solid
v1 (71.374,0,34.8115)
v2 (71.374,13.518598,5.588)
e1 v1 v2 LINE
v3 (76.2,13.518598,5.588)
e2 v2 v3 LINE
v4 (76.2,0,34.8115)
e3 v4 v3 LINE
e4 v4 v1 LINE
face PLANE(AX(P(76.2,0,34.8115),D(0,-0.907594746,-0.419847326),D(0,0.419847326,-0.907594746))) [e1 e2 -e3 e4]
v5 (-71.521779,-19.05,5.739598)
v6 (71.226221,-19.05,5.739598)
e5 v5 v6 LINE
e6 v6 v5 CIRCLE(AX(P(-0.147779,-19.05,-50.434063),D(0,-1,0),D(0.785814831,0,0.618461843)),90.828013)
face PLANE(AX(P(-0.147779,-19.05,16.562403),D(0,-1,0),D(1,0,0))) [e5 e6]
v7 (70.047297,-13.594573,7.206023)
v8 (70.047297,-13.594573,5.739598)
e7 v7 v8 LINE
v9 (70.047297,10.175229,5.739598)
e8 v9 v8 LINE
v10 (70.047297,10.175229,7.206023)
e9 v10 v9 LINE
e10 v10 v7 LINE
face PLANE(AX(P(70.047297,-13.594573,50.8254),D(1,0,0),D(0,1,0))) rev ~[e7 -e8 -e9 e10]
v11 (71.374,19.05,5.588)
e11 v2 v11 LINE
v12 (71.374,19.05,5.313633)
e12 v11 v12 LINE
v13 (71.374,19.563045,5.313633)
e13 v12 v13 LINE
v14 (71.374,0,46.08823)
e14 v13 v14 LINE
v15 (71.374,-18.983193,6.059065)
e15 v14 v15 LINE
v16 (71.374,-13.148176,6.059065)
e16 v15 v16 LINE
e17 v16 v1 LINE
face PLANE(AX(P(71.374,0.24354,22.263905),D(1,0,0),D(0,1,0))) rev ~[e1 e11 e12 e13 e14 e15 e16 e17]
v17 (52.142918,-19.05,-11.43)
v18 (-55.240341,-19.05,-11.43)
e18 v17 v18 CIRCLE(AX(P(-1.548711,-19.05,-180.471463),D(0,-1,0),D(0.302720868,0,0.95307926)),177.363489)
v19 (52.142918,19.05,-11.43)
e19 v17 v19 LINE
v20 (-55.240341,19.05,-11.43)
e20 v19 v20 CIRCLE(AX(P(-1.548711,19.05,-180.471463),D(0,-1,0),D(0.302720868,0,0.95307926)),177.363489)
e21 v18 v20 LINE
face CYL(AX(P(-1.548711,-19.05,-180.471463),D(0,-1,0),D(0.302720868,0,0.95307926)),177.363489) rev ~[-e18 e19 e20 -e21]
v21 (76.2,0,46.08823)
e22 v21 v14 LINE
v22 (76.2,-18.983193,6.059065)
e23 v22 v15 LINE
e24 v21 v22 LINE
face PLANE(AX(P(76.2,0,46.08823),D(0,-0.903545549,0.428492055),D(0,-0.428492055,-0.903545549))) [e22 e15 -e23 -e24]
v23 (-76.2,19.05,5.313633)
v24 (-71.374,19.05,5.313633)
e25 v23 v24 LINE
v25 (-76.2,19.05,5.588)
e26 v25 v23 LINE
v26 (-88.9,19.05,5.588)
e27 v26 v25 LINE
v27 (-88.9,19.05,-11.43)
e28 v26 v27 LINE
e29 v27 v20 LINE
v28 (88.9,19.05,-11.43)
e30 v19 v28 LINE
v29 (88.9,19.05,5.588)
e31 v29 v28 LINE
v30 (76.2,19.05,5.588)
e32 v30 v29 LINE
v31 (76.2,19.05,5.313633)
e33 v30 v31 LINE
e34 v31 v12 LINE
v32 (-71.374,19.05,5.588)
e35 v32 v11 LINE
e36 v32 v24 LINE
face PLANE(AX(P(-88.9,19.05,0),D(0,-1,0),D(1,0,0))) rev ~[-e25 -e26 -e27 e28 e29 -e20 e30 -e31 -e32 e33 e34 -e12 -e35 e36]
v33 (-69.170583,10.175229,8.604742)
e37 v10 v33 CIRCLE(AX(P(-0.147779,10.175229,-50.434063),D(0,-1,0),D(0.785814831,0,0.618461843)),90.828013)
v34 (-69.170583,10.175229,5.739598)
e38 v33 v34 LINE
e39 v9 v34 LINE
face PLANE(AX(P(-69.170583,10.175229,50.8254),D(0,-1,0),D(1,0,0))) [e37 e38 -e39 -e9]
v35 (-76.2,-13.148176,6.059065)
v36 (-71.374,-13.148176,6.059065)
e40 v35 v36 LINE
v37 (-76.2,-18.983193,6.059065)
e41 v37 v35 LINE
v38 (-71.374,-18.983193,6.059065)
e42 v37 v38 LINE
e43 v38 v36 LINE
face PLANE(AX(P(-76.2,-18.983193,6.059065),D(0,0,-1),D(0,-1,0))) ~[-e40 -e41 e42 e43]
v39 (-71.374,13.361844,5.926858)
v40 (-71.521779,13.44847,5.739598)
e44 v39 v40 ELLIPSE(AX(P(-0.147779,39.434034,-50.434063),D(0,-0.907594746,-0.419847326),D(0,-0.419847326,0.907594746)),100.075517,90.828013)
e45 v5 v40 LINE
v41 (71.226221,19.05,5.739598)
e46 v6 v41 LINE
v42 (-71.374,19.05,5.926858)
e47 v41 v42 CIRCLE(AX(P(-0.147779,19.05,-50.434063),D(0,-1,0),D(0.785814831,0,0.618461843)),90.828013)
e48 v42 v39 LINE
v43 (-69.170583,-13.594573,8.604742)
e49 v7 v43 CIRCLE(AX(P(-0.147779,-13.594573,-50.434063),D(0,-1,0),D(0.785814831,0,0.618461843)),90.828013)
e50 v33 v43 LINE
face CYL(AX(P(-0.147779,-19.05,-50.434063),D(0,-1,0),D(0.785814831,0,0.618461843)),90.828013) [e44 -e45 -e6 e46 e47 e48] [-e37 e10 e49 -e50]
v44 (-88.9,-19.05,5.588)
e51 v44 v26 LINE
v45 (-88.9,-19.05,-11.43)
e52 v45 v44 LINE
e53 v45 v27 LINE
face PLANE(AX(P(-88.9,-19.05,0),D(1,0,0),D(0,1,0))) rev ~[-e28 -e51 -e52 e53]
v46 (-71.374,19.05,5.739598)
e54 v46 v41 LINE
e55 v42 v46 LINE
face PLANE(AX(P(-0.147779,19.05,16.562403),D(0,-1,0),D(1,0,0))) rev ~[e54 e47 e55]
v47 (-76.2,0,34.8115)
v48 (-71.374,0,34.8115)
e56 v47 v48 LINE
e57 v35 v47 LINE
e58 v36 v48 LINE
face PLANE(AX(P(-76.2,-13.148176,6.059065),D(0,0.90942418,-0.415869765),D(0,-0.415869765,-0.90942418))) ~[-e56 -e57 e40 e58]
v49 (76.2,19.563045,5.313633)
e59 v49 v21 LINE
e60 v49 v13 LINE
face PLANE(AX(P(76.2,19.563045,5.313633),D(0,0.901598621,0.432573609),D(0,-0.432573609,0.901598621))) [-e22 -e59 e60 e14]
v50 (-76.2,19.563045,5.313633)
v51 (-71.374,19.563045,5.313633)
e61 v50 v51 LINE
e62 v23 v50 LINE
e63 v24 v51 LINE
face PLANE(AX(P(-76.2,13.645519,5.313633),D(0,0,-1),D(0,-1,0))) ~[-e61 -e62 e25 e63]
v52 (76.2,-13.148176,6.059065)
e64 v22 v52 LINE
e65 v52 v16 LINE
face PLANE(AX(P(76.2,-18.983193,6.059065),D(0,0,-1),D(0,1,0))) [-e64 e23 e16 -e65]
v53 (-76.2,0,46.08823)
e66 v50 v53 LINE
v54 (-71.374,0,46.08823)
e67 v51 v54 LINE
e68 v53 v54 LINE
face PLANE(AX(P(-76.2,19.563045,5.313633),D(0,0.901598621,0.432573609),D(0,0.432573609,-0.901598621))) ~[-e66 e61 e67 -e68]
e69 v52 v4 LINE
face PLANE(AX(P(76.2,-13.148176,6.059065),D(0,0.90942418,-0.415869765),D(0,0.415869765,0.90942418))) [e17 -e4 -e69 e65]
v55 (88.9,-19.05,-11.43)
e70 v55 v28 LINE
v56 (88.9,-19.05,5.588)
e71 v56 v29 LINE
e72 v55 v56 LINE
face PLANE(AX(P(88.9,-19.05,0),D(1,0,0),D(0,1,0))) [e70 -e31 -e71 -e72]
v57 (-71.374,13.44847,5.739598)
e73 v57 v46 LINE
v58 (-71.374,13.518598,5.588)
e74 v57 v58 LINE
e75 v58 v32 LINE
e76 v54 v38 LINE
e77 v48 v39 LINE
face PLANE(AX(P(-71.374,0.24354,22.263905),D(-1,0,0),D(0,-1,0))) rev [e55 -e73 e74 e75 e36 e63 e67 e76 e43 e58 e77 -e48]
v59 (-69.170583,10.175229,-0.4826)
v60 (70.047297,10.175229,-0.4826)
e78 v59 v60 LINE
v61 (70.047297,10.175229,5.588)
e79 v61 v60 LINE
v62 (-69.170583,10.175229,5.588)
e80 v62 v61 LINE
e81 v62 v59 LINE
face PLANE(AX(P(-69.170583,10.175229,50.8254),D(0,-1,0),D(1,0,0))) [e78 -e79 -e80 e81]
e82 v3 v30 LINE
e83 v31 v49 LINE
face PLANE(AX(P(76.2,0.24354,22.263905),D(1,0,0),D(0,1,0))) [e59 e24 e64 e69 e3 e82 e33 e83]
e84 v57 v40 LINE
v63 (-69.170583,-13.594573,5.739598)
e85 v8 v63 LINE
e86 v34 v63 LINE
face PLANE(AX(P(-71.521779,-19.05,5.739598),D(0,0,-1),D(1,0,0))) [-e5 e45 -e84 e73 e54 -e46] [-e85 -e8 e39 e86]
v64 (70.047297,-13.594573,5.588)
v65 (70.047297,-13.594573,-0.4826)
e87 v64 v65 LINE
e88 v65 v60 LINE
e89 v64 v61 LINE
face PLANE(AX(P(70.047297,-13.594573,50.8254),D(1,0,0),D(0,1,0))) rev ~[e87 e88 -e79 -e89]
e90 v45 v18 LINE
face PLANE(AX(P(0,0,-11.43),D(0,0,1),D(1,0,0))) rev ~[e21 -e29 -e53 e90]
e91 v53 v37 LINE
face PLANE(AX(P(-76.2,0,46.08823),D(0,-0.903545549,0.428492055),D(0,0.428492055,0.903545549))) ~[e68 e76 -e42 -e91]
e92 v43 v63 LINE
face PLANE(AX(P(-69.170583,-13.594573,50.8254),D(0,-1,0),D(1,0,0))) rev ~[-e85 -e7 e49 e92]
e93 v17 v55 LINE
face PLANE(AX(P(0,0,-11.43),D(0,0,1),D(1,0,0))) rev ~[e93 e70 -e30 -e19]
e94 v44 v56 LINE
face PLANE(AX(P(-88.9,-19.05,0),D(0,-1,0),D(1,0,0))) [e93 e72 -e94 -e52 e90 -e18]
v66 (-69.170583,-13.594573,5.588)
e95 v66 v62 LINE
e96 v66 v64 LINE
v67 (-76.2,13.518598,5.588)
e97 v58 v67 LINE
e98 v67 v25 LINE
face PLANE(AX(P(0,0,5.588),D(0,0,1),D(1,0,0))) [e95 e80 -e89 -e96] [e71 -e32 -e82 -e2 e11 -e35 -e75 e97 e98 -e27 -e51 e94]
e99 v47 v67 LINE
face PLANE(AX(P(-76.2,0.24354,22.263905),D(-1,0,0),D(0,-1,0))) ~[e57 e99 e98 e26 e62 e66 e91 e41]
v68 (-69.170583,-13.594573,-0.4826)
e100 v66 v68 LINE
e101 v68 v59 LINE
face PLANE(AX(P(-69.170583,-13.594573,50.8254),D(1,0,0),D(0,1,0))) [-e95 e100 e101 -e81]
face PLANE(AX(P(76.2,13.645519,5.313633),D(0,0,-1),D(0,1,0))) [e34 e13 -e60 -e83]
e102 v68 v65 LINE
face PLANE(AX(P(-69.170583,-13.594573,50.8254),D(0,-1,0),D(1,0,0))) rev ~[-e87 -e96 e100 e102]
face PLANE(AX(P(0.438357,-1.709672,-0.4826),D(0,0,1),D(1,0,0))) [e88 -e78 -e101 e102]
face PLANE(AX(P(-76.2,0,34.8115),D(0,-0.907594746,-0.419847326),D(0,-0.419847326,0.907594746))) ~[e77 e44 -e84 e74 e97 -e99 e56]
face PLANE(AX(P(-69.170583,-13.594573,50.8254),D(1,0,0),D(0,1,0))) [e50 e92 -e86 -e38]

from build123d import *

# Parameters (mm, degrees)
F0_W      = 177.8
F0_H      = 38.1
F1_DEPTH  = 5.588
F4_DEPTH  = 4.826
F6_DEPTH  = 11.43
F8_DEPTH  = 233.426
F11_DEPTH = 38.1
F13_W     = 139.2178796232
F13_H     = 23.7698024139
F14_DEPTH = 51.308


with BuildPart() as f1:
    # F0 (on Top) → F1 (new body)
    with BuildSketch(Plane.XY):
        Rectangle(F0_W, F0_H)
    extrude(amount=F1_DEPTH)

    # F3 (on offset) → F4 (join)
    with BuildSketch(Plane.YZ.offset(76.2)):
        Polygon((0, 46.0882298648), (-18.9831927419, 6.0590645298), (-13.1481755525, 6.0590645298), (0, 34.8115004599), (13.6455185711, 5.3136325441), (19.5630453527, 5.3136325441), align=None)
    extrude(amount=-F4_DEPTH)

    # F5: F1 across plane


with BuildPart() as f1_1:
    add(f1.part)
    add(f1.part.mirror(Plane.YZ))

    # F6 (add): a face of the model
    f6_faces = [f1_1.faces().sort_by_distance(p)[0] for p in [
        (0, 0, 0),
    ]]
    extrude(f6_faces, amount=F6_DEPTH)

    # F7 (on face) → F8 (cut)
    with BuildSketch(Plane.XZ.offset(19.05)):
        with BuildLine():
            Line((-55.2403405309, -11.43), (52.1429181099, -11.43))
            ThreePointArc((52.1429181099, -11.43), (-1.5487112105, -3.1079738738), (-55.2403405309, -11.43))
        make_face()
    extrude(amount=-F8_DEPTH, mode=Mode.SUBTRACT)

    # F10 (on offset) → F11 (join)
    with BuildSketch(Plane.XZ.offset(19.05)):
        with BuildLine():
            Line((-71.5217785408, 5.7395980693), (71.2262214592, 5.7395980693))
            ThreePointArc((71.2262214592, 5.7395980693), (-0.1477785408, 40.3939508929), (-71.5217785408, 5.7395980693))
        make_face()
    extrude(amount=-F11_DEPTH)

    # F13 (on offset) → F14 (cut)
    with BuildSketch(Plane.XY.offset(50.8254)):
        with Locations((0.4383567721, -1.7096721567)):
            Rectangle(F13_W, F13_H)
    extrude(amount=-F14_DEPTH, mode=Mode.SUBTRACT)


solid = f1_1.part
